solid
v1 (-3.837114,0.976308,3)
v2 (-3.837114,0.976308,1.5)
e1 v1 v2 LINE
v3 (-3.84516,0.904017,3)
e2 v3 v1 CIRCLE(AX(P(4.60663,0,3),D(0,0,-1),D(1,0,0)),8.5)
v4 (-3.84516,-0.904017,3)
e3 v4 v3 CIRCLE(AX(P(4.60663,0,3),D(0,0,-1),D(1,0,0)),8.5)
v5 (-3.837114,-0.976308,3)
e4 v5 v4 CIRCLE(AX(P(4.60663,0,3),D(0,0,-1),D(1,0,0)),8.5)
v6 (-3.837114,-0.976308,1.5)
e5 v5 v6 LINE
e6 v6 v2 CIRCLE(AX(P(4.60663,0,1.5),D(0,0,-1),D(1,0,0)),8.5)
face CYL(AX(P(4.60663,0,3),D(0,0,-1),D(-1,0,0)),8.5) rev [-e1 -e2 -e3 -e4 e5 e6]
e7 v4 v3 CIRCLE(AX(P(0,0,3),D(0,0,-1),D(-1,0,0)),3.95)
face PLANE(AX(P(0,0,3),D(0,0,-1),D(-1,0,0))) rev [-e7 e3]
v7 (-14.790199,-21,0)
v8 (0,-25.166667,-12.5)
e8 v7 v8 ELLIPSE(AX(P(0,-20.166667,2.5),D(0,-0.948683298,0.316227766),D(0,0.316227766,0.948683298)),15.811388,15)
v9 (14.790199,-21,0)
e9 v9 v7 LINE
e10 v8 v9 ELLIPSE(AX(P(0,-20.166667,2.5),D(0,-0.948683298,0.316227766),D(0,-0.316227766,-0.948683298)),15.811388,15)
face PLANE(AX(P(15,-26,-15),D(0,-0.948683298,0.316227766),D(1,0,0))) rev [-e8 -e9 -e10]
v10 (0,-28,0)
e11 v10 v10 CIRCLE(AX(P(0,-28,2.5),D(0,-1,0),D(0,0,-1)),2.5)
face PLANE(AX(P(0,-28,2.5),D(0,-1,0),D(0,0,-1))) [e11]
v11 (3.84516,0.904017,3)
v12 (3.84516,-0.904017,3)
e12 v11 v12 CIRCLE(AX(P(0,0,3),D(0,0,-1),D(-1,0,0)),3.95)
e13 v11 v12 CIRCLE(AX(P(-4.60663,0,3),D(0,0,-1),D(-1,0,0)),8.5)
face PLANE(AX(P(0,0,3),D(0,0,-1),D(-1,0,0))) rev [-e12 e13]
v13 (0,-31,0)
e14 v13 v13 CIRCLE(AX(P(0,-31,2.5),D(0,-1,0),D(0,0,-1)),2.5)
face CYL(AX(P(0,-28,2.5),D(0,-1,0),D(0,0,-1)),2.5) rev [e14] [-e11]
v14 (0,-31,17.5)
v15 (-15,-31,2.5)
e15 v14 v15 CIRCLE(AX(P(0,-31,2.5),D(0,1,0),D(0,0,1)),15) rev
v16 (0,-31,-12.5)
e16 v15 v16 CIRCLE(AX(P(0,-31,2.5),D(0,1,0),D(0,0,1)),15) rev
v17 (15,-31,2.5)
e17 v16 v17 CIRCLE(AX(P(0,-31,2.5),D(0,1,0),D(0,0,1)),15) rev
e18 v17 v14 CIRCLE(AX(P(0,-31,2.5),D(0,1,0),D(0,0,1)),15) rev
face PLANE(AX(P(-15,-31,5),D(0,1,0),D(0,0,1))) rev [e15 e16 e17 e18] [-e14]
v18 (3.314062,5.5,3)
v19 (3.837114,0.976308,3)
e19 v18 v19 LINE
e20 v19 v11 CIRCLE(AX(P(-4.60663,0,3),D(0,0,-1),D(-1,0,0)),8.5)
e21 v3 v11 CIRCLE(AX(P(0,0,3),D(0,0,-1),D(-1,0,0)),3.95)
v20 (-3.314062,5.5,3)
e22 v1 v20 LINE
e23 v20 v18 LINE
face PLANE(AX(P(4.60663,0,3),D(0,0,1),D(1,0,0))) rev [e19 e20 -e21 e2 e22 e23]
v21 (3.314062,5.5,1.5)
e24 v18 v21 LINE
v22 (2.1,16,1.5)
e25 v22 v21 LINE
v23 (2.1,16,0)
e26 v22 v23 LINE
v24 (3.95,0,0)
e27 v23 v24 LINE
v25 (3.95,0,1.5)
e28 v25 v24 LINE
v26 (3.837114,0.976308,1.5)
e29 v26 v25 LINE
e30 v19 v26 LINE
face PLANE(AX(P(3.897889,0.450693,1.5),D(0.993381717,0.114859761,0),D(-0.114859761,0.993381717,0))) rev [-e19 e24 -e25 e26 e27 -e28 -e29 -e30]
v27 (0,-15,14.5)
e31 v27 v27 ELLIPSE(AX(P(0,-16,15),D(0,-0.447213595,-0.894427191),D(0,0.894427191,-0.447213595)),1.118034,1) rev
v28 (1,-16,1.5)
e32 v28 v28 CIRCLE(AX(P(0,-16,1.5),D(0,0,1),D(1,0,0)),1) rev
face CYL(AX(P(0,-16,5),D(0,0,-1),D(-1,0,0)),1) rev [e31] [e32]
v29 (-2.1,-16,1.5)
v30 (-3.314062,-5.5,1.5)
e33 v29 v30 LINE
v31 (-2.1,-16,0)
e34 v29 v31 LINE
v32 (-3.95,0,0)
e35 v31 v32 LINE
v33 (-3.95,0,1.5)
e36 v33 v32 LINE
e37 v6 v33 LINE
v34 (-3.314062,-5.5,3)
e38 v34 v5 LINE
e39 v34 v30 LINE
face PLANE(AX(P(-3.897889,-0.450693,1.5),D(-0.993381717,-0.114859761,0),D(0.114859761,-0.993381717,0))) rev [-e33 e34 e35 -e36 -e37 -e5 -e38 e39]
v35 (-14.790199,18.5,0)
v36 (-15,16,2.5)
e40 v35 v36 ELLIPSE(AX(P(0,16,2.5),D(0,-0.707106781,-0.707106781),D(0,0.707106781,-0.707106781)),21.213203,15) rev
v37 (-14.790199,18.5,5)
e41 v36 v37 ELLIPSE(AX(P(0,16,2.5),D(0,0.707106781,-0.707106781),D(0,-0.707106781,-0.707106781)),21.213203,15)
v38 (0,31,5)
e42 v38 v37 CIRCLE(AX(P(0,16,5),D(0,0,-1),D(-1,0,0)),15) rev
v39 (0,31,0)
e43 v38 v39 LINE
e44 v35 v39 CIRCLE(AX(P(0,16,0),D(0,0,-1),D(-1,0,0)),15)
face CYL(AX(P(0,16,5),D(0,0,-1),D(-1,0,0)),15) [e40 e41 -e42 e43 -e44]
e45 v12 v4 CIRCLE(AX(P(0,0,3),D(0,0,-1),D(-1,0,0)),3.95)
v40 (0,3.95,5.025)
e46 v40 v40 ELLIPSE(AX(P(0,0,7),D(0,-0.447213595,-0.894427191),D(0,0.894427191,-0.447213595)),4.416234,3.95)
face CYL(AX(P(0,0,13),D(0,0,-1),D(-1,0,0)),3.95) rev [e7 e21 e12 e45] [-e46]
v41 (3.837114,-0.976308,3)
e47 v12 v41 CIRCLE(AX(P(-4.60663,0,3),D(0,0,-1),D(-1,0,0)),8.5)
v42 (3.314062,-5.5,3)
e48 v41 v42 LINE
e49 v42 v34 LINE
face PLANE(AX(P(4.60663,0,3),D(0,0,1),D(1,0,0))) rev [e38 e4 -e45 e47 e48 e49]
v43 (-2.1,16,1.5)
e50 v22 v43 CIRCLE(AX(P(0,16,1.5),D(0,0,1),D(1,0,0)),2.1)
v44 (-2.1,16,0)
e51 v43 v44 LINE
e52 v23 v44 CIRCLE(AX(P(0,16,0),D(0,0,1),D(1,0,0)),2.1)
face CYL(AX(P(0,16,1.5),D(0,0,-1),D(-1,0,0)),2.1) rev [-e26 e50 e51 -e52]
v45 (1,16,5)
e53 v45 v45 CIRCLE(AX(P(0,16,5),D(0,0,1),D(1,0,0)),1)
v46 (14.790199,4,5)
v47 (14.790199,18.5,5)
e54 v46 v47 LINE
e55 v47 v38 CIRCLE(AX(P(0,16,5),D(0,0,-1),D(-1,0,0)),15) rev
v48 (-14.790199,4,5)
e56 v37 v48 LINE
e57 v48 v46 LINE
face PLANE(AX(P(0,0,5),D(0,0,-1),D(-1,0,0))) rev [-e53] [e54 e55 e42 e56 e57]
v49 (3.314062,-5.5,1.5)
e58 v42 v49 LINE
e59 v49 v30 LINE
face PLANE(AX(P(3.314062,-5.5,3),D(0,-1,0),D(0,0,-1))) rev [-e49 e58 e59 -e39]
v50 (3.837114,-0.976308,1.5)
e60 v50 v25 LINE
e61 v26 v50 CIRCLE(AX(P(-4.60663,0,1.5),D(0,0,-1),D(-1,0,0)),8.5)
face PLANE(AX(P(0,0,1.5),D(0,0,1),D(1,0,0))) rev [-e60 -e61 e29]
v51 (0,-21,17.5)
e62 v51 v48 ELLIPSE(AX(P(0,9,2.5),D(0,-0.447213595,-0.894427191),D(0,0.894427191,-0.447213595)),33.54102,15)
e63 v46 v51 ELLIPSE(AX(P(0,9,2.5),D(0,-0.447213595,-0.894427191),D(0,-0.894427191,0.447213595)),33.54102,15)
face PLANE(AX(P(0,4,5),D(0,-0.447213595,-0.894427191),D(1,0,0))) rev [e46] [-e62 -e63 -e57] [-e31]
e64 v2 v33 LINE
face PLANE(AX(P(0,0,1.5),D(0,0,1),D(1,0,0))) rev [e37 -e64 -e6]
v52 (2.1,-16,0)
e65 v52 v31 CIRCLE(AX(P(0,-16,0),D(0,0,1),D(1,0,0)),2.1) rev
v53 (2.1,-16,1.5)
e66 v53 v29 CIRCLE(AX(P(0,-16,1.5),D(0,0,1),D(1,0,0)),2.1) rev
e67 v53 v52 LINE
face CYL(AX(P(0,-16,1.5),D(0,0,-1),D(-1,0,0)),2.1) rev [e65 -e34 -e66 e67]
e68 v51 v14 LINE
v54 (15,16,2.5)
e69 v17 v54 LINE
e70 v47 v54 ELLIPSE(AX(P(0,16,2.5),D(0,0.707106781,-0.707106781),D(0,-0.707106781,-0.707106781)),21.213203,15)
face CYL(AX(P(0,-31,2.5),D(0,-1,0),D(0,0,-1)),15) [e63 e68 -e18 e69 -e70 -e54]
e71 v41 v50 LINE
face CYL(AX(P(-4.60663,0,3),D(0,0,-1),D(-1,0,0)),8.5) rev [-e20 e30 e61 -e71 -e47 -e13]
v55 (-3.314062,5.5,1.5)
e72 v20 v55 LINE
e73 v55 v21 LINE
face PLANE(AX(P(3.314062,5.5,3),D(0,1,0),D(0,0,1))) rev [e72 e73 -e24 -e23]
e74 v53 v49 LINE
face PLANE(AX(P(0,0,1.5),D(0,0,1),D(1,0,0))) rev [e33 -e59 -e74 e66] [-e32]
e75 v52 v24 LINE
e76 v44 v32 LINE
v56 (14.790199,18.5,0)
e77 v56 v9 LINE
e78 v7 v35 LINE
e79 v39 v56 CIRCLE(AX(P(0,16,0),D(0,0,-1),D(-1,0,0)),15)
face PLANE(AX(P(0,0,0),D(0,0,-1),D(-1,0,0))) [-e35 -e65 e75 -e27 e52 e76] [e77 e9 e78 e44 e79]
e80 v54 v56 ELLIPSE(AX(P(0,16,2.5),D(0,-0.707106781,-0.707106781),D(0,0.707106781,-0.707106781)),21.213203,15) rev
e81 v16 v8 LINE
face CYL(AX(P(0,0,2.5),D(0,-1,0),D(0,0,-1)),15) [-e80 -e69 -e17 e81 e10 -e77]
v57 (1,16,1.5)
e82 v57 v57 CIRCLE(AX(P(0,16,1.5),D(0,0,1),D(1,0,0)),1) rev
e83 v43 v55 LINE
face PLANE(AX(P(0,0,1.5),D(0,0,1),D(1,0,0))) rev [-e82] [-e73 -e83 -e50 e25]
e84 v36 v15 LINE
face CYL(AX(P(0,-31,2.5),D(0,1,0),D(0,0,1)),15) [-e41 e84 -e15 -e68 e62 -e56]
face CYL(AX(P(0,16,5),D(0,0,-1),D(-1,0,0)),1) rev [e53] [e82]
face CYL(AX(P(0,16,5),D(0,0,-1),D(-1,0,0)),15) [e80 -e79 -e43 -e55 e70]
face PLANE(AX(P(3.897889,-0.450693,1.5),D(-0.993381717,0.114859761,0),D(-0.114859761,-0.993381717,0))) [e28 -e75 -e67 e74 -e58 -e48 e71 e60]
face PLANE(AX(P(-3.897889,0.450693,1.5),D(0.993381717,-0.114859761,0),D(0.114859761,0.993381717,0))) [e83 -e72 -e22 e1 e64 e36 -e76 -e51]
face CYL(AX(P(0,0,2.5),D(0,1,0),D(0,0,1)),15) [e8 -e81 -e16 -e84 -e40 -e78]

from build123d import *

# Parameters (mm, degrees)
SKETCH2_W            = 30
SKETCH2_H            = 62
BOSS_EXTRUDE10_DEPTH = 5
SKETCH1_R            = 1
CUT_EXTRUDE5_DEPTH   = 1.5
SKETCH1_14_R         = 1
CUT_EXTRUDE6_DEPTH   = 35.799425283
FILLET1_R            = 15
SKETCH5_W            = 30
SKETCH5_H            = 5
BOSS_EXTRUDE11_DEPTH = 12.5
FILLET2_R            = 15
SKETCH7_R            = 2.5
CUT_EXTRUDE7_DEPTH   = 3
CHAMFER1_SIZE        = 30
CHAMFER1_SIZE_2      = 15
CHAMFER2_SIZE        = 5
CHAMFER2_SIZE_2      = 15
CUT_EXTRUDE8_DEPTH   = 1.5
SKETCH9_R            = 3.95
CUT_EXTRUDE9_DEPTH   = 10


# Some blends are built 0.0001 mm under size
with BuildPart() as part:
    # Sketch2 → Boss-Extrude10 (new body)
    with BuildSketch(Plane.XY):
        Rectangle(SKETCH2_W, SKETCH2_H)
    extrude(amount=BOSS_EXTRUDE10_DEPTH)

    # Sketch1 → Cut-Extrude5 (cut)
    with BuildSketch(Plane.XY):
        with BuildLine():
            ThreePointArc((2.1, -16), (0, -18.1), (-2.1, -16))
            Line((-2.1, -16), (-3.95, 0))
            Line((-3.95, 0), (-2.1, 16))
            ThreePointArc((-2.1, 16), (0, 18.1), (2.1, 16))
            Line((2.1, 16), (3.95, 0))
            Line((3.95, 0), (2.1, -16))
        make_face()
        with Locations((0, -16)):
            Circle(SKETCH1_R, mode=Mode.SUBTRACT)
        with Locations((0, 16)):
            Circle(SKETCH1_R, mode=Mode.SUBTRACT)
    extrude(amount=CUT_EXTRUDE5_DEPTH, mode=Mode.SUBTRACT)

    # Sketch1<14> → Cut-Extrude6 (cut, through all)
    with BuildSketch(Plane.XY):
        with Locations((0, 16)):
            Circle(SKETCH1_14_R)
        with Locations((0, -16)):
            Circle(SKETCH1_14_R)
    extrude(amount=CUT_EXTRUDE6_DEPTH, mode=Mode.SUBTRACT)

    # Fillet1
    fillet1_edges = [part.edges().sort_by_distance(p)[0] for p in [
        (-15, 31, 2.5),
        (15, 31, 2.5),
    ]]
    fillet(fillet1_edges, radius=FILLET1_R - 0.0001)  # a hair under: the kernel refuses the full size

    # Sketch5 → Boss-Extrude11 (add)
    with BuildSketch(Plane(origin=(0, 0, 0), x_dir=(-1, 0, 0), z_dir=(0, 0, -1))):
        with Locations((0, -28.5)):
            Rectangle(SKETCH5_W, SKETCH5_H)
    boss_extrude11 = extrude(amount=BOSS_EXTRUDE11_DEPTH)

    # Mirror1: Boss-Extrude11 across plane
    add(boss_extrude11.mirror(Plane.XY.offset(2.5)))

    # Fillet2
    # the kernel refuses this fillet: 15 mm, written as the material it takes off along each edge
    with BuildSketch(Plane(origin=(15, 64, 17.5), x_dir=(0, 0, -1), z_dir=(0, -1, 0)), Plane(origin=(-15, -121, 17.5), x_dir=(0, 0, -1), z_dir=(0, 1, 0))) as fillet2_piece_1:
        with BuildLine():
            CenterArc((FILLET2_R, -FILLET2_R), FILLET2_R, 90, 90)
            Line((0, -FILLET2_R), (-FILLET2_R * 0.02, -FILLET2_R))
            Line((-FILLET2_R * 0.02, -FILLET2_R), (-FILLET2_R * 0.02, FILLET2_R * 0.02))
            Line((-FILLET2_R * 0.02, FILLET2_R * 0.02), (FILLET2_R, FILLET2_R * 0.02))
            Line((FILLET2_R, FILLET2_R * 0.02), (FILLET2_R, 0))
        make_face()
    extrude(amount=185, mode=Mode.SUBTRACT)
    with BuildSketch(Plane(origin=(-15, -121, -12.5), x_dir=(0, 0, 1), z_dir=(0, 1, 0)), Plane(origin=(15, 64, -12.5), x_dir=(0, 0, 1), z_dir=(0, -1, 0))) as fillet2_piece_2:
        with BuildLine():
            CenterArc((FILLET2_R, FILLET2_R), FILLET2_R, 180, 90)
            Line((0, FILLET2_R), (-FILLET2_R * 0.02, FILLET2_R))
            Line((-FILLET2_R * 0.02, FILLET2_R), (-FILLET2_R * 0.02, -FILLET2_R * 0.02))
            Line((-FILLET2_R * 0.02, -FILLET2_R * 0.02), (FILLET2_R, -FILLET2_R * 0.02))
            Line((FILLET2_R, -FILLET2_R * 0.02), (FILLET2_R, 0))
        make_face()
    extrude(amount=185, mode=Mode.SUBTRACT)

    # Sketch7 → Cut-Extrude7 (cut)
    with BuildSketch(Plane.XZ.offset(31)):
        with Locations(Location((0, 2.5, 0), (0, 0, 270))):
            Circle(SKETCH7_R)
    extrude(amount=-CUT_EXTRUDE7_DEPTH, mode=Mode.SUBTRACT)

    # Chamfer1
    # the kernel refuses this chamfer: 30, 15 mm, written as the material it adds along each edge
    with BuildSketch(Plane(origin=(-92.485065671, -26, 5), x_dir=(0, 0.9998508956747117, -0.017268075123668125), z_dir=(1, 0, 0))) as chamfer1_piece_1_section:
        Polygon((CHAMFER1_SIZE * 0.999850895675, CHAMFER1_SIZE * 0.0172680751237), (-CHAMFER1_SIZE_2 * 0.0172680751237, CHAMFER1_SIZE_2 * 0.999850895675), (0, 0), align=None)
    chamfer1_piece_1 = extrude(amount=184.970131343, mode=Mode.PRIVATE)
    chamfer1_piece_1 = chamfer1_piece_1 & Plane(origin=(0, -14.759423462, 2.5), x_dir=(0, 0, -1), z_dir=(0, -1, 0)) * Cylinder(15, 490, mode=Mode.PRIVATE)
    chamfer1_piece_1 = chamfer1_piece_1 - Plane(origin=(0, -16, 8.704221218), x_dir=(1, 0, 0), z_dir=(0, 0, -1)) * Cylinder(1, 490, mode=Mode.PRIVATE)
    add(chamfer1_piece_1)

    # Chamfer2
    # the kernel refuses this chamfer: 15, 5 mm, written as the material it adds along each edge
    with BuildSketch(Plane(origin=(-53.716114618, -26, 0), x_dir=(0, 0.9940388851139267, 0.10902612017980706), z_dir=(1, 0, 0))) as chamfer2_piece_1_section:
        Polygon((CHAMFER2_SIZE * 0.994038885114, -CHAMFER2_SIZE * 0.10902612018), (-CHAMFER2_SIZE_2 * 0.10902612018, -CHAMFER2_SIZE_2 * 0.994038885114), (0, 0), align=None)
    chamfer2_piece_1 = extrude(amount=107.432229235, mode=Mode.PRIVATE)
    chamfer2_piece_1 = chamfer2_piece_1 & Plane(origin=(0, -24.267585927, 2.5), x_dir=(0, 0, -1), z_dir=(0, -1, 0)) * Cylinder(15, 275, mode=Mode.PRIVATE)
    add(chamfer2_piece_1)

    # Sketch8 → Cut-Extrude8 (cut)
    with BuildSketch(Plane(origin=(0, 0, 1.5), x_dir=(-1, 0, 0), z_dir=(0, 0, -1))):
        with BuildLine():
            Line((-3.3140625, -5.5), (3.3140625, -5.5))
            Line((3.3140625, -5.5), (3.837114391, -0.976307969))
            ThreePointArc((3.837114391, -0.976307969), (3.893369798, 0), (3.837114391, 0.976307969))
            Line((3.837114391, 0.976307969), (3.3140625, 5.5))
            Line((3.3140625, 5.5), (-3.3140625, 5.5))
            Line((-3.3140625, 5.5), (-3.837114391, 0.976307969))
            ThreePointArc((-3.837114391, 0.976307969), (-3.893369798, 0), (-3.837114391, -0.976307969))
            Line((-3.837114391, -0.976307969), (-3.3140625, -5.5))
        make_face()
    extrude(amount=-CUT_EXTRUDE8_DEPTH, mode=Mode.SUBTRACT)

    # Sketch9 → Cut-Extrude9 (cut)
    with BuildSketch(Plane(origin=(0, 0, 3), x_dir=(-1, 0, 0), z_dir=(0, 0, -1))):
        with Locations(Location((0, 0, 0), (0, 0, 13.230259738))):
            Circle(SKETCH9_R)
    extrude(amount=-CUT_EXTRUDE9_DEPTH, mode=Mode.SUBTRACT)


solid = part.part
